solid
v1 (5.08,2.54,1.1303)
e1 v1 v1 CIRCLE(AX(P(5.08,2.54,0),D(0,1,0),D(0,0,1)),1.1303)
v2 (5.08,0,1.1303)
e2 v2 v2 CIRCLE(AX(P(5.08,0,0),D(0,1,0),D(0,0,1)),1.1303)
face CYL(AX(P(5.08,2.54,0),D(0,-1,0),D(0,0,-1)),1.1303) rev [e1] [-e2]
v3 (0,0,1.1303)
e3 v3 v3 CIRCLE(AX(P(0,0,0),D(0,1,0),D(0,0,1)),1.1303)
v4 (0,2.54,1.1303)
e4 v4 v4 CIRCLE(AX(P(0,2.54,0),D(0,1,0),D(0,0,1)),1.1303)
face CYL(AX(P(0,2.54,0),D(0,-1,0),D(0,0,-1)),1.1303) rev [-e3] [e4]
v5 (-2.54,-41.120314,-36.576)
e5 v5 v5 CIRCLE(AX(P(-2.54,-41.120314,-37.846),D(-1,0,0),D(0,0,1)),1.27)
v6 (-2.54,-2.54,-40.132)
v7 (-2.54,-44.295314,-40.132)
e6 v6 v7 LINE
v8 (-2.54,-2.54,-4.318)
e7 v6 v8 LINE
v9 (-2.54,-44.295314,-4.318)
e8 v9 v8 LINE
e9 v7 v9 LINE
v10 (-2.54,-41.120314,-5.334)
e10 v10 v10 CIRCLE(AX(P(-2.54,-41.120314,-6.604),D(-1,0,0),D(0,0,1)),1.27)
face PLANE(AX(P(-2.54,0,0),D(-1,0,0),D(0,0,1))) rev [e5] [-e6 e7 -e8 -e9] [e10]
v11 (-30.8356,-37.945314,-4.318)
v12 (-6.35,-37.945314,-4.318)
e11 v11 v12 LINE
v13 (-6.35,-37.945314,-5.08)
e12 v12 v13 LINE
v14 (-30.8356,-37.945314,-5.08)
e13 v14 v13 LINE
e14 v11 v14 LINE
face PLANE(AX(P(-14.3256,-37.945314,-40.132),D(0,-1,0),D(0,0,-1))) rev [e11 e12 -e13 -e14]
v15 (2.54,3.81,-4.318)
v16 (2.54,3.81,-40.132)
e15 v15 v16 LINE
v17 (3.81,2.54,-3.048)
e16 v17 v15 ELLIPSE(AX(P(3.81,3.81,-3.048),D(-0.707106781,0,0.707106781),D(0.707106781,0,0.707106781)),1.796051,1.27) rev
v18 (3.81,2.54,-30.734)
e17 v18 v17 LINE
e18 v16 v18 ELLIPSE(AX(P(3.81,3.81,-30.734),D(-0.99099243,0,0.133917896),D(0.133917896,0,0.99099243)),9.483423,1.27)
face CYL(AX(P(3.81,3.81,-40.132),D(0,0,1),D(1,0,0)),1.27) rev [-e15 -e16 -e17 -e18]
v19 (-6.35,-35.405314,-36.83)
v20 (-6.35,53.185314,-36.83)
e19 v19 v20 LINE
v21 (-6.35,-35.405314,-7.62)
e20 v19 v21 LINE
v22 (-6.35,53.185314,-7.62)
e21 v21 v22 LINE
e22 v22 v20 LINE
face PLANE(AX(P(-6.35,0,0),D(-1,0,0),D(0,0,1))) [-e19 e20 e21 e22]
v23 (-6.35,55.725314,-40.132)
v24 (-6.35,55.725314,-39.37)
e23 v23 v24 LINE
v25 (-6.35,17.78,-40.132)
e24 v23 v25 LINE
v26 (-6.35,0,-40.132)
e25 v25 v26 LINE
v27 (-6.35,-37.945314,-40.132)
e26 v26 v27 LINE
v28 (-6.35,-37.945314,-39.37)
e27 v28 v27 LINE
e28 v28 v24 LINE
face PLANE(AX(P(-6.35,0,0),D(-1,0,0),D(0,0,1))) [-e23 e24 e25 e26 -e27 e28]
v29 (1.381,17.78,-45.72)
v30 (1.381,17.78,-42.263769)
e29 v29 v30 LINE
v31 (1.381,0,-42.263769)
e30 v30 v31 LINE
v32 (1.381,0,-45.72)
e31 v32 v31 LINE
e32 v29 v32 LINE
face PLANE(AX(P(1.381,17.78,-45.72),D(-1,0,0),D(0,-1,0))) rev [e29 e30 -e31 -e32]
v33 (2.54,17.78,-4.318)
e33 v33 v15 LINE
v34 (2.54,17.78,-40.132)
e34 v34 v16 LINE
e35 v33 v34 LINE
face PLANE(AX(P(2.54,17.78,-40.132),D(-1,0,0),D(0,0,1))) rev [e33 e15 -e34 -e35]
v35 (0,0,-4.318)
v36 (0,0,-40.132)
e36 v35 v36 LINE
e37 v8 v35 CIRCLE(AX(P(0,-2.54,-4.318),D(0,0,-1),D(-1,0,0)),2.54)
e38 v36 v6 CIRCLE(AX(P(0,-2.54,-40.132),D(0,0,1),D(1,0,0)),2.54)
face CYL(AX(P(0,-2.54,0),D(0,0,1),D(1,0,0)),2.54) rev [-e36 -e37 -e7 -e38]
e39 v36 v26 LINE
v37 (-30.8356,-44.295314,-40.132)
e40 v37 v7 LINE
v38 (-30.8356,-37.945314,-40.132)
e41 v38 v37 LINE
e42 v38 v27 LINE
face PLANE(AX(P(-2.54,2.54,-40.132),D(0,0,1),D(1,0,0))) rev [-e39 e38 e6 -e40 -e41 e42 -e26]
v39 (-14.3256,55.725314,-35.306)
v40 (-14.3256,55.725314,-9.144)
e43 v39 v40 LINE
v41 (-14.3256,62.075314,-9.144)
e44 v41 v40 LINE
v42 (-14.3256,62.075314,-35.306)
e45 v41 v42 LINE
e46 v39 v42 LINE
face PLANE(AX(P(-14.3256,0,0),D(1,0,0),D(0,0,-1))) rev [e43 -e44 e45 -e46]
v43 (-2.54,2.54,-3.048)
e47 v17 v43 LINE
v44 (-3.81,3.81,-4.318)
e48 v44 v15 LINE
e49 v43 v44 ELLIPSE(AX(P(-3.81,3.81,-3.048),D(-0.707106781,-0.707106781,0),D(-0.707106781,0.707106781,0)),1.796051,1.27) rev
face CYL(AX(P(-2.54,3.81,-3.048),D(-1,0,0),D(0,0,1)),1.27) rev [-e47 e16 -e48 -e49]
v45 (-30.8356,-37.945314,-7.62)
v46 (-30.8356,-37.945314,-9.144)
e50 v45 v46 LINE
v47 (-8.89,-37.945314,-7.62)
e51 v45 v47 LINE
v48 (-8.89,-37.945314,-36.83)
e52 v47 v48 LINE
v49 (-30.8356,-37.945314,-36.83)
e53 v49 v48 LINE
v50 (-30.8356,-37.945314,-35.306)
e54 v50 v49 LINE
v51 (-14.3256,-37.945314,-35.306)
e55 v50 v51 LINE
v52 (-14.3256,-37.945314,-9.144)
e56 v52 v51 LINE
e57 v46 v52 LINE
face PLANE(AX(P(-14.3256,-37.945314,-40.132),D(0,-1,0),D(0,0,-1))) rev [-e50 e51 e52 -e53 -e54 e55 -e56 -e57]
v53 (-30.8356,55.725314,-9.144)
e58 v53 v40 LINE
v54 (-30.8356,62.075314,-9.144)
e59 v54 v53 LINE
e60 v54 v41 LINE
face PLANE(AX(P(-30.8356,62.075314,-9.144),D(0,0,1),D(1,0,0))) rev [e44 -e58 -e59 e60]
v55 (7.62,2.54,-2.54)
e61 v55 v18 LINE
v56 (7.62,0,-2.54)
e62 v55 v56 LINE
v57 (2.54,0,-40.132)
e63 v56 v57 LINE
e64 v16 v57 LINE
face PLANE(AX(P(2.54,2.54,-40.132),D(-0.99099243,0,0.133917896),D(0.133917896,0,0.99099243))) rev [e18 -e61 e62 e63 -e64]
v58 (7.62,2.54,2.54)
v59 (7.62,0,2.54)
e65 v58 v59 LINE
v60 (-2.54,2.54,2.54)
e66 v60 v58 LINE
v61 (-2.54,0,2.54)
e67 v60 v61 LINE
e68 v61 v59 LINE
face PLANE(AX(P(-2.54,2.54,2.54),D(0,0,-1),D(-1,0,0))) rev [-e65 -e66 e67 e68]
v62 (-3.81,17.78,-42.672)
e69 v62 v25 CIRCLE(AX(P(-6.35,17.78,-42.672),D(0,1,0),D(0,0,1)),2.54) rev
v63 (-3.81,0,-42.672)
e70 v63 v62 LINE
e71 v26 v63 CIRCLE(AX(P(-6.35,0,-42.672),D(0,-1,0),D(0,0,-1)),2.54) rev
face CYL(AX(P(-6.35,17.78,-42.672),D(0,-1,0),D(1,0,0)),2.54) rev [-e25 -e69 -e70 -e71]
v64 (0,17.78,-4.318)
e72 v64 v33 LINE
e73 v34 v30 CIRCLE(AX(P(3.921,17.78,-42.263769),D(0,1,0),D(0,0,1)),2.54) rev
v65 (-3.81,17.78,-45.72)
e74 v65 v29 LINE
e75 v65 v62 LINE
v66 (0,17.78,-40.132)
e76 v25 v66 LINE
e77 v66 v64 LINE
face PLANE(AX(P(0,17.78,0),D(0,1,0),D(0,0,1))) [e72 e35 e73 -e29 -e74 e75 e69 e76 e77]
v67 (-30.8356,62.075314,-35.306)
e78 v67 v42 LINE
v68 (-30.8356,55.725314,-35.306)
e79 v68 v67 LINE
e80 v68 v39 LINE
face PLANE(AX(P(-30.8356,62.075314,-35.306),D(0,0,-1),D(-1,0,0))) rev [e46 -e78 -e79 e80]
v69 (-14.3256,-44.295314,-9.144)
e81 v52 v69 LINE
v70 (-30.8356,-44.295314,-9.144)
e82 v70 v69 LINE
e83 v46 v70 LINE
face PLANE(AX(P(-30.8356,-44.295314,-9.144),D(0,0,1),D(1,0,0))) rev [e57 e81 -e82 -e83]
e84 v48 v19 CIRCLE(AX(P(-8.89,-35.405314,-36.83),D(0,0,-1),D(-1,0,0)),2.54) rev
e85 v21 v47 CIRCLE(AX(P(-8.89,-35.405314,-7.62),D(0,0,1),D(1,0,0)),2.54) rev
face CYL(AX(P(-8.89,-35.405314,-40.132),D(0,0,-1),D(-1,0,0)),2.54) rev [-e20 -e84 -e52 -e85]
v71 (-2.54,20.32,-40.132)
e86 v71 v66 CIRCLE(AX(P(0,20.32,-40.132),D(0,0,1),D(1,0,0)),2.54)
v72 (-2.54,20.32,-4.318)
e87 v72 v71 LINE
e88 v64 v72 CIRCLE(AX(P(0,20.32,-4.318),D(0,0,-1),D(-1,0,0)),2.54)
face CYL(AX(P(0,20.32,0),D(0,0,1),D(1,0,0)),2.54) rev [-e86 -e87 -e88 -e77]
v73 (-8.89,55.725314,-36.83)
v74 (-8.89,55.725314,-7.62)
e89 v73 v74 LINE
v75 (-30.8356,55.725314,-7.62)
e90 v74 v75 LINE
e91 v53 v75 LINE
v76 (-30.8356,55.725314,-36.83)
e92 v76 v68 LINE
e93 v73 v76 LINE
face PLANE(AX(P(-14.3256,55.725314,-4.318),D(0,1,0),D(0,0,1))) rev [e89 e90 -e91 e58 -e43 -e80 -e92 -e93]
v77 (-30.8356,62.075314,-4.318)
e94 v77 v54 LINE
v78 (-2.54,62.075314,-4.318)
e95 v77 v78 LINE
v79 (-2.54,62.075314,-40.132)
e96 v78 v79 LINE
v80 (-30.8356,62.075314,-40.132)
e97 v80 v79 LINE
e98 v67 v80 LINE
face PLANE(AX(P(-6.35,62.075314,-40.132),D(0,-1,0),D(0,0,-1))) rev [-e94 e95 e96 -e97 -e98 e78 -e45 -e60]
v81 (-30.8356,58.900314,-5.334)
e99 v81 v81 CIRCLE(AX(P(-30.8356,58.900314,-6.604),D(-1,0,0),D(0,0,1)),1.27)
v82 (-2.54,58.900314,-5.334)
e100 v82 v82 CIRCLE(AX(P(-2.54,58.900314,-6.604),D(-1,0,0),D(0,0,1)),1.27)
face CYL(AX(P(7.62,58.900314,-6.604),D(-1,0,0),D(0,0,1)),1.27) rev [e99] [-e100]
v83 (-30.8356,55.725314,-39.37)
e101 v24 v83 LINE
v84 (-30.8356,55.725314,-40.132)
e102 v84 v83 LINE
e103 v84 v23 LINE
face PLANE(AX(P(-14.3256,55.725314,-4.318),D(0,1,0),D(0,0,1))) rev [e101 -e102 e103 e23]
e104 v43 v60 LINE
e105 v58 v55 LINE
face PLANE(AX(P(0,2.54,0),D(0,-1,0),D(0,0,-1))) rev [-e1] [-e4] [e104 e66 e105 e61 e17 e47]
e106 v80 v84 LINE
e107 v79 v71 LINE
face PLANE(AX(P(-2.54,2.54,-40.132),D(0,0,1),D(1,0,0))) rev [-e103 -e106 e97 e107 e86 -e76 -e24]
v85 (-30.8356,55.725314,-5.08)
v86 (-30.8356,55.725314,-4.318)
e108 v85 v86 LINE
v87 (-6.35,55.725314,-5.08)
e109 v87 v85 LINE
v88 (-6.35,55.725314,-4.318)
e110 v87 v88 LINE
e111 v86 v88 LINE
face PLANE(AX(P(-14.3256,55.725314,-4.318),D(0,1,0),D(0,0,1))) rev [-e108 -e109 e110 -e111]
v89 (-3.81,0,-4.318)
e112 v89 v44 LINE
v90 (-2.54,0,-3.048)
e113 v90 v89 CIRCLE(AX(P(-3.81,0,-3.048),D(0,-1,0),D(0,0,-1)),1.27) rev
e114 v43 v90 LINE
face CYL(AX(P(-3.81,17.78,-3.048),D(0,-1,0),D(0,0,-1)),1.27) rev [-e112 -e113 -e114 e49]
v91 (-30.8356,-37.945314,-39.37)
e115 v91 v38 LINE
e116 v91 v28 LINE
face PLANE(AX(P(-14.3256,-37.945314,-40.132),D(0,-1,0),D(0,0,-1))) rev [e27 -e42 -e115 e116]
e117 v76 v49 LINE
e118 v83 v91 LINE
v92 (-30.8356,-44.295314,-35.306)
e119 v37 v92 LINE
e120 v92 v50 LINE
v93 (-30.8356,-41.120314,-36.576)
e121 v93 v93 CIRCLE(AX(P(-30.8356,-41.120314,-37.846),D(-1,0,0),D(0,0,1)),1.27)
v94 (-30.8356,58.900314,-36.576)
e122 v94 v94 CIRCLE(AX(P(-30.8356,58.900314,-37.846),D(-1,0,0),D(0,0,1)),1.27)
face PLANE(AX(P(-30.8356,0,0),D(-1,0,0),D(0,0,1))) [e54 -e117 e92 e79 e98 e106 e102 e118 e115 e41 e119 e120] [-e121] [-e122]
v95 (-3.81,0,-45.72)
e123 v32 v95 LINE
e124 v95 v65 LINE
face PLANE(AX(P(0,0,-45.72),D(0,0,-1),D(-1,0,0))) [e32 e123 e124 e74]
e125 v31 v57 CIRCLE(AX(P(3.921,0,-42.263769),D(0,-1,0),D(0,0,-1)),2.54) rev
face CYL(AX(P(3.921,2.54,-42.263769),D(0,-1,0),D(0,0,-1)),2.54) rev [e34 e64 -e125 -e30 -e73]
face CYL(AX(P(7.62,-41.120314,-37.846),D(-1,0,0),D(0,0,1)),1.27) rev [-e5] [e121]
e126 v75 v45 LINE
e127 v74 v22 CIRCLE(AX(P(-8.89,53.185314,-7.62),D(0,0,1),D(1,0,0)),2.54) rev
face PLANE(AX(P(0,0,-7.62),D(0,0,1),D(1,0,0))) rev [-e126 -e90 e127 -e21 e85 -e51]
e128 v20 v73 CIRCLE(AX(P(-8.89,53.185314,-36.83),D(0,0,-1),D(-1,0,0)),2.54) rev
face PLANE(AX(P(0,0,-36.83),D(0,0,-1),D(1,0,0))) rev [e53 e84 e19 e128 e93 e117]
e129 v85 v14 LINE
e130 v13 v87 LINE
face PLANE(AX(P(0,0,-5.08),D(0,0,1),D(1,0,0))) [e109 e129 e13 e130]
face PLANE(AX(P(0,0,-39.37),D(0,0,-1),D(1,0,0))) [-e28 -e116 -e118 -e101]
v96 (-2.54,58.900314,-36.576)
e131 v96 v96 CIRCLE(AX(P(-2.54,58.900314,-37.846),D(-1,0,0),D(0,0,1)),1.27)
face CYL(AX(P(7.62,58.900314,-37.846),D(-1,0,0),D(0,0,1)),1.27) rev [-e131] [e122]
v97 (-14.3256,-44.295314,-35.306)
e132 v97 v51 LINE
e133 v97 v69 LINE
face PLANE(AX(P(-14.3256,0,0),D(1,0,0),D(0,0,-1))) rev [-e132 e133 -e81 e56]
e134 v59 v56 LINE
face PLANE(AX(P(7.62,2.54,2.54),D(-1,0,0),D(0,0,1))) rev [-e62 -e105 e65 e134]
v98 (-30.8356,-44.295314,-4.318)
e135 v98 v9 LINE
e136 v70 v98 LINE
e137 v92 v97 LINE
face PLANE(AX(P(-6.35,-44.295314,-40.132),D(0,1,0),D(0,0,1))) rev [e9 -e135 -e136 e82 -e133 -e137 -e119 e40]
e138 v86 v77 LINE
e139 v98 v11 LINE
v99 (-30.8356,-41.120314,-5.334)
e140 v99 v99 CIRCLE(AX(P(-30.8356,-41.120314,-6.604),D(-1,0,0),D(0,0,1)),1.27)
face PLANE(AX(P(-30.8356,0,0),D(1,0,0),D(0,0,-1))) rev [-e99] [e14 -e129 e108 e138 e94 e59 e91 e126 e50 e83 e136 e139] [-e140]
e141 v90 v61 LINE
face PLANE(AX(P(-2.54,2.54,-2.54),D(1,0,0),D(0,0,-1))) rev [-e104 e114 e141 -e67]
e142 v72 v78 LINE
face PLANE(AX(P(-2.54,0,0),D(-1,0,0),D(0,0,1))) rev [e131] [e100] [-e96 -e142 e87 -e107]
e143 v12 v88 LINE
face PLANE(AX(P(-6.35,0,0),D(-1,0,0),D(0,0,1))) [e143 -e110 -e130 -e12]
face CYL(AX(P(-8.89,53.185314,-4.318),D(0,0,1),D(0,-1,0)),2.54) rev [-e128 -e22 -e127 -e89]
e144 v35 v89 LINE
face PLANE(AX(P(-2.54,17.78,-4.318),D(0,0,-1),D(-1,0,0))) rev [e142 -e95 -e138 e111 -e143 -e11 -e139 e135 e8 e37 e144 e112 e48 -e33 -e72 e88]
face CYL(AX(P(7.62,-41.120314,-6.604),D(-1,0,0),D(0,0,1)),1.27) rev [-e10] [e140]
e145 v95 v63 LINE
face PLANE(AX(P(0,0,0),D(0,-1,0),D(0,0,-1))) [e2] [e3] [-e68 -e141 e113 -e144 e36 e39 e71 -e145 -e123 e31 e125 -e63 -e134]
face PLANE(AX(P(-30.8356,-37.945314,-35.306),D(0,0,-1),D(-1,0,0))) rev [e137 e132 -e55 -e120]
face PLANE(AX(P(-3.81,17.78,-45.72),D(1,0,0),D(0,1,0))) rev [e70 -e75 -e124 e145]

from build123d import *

# Parameters (mm, degrees)
SKETCH1_R           = 1.1303
BOSS_EXTRUDE1_DEPTH = 2.54
SKETCH2_W           = 5.08
SKETCH2_H           = 35.814
BOSS_EXTRUDE2_DEPTH = 15.24
SKETCH3_W           = 35.814
SKETCH3_H           = 106.370628
BOSS_EXTRUDE3_DEPTH = 3.81
FILLET1_R           = 1.27
SKETCH4_W           = 5.191
SKETCH4_H           = 17.78
BOSS_EXTRUDE4_DEPTH = 5.588
SKETCH5_W           = 35.814
SKETCH5_H           = 6.35
BOSS_EXTRUDE5_DEPTH = 7.9756
SKETCH6_W           = 4.826
SKETCH6_H           = 6.35
BOSS_EXTRUDE6_DEPTH = 16.51
BOSS_EXTRUDE8_START = -0.762
SKETCH7_W           = 24.4856
SKETCH7_H           = 93.670628
BOSS_EXTRUDE8_DEPTH = 2.54
FILLET2_R           = 2.54
SKETCH8_R           = 1.27
CUT_EXTRUDE1_DEPTH  = 87.153909833


with BuildPart() as part:
    # Sketch1 → Boss-Extrude1 (new body)
    with BuildSketch(Plane(origin=(0, 0, 0), x_dir=(1, 0, 0), z_dir=(0, 1, 0))):
        Polygon((-2.54, 2.54), (-2.54, 40.132), (2.54, 40.132), (7.62, 2.54), (7.62, -2.54), (-2.54, -2.54), align=None)
        with Locations(Location((0, 0, 0), (0, 0, 270))):
            Circle(SKETCH1_R, mode=Mode.SUBTRACT)
        with Locations(Location((5.08, 0, 0), (0, 0, 270))):
            Circle(SKETCH1_R, mode=Mode.SUBTRACT)
    extrude(amount=BOSS_EXTRUDE1_DEPTH)

    # Sketch2 → Boss-Extrude2 (add)
    with BuildSketch(Plane(origin=(0, 2.54, 0), x_dir=(1, 0, 0), z_dir=(0, 1, 0))):
        with Locations((0, 22.225)):
            Rectangle(SKETCH2_W, SKETCH2_H)
    extrude(amount=BOSS_EXTRUDE2_DEPTH)

    # Sketch3 → Boss-Extrude3 (add)
    with BuildSketch(Plane.ZY.offset(2.54)):
        with Locations((-22.225, 8.89)):
            Rectangle(SKETCH3_W, SKETCH3_H)
    extrude(amount=BOSS_EXTRUDE3_DEPTH)

    # Fillet1
    fillet1_edges = [part.edges().sort_by_distance(p)[0] for p in [
        (0, 2.54, -4.318),
        (2.54, 2.54, -22.225),
        (-2.54, 1.27, -4.318),
    ]]
    fillet(fillet1_edges, radius=FILLET1_R)

    # Sketch4 → Boss-Extrude4 (add)
    with BuildSketch(Plane(origin=(0, 0, -40.132), x_dir=(-1, 0, 0), z_dir=(0, 0, -1))):
        with Locations((1.2145, 8.89)):
            Rectangle(SKETCH4_W, SKETCH4_H)
    extrude(amount=BOSS_EXTRUDE4_DEPTH)

    # Sketch5 → Boss-Extrude5 (add)
    with BuildSketch(Plane.ZY.offset(6.35)):
        with Locations((-22.225, -41.120314)):
            Rectangle(SKETCH5_W, SKETCH5_H)
        with Locations((-22.225, 58.900314)):
            Rectangle(SKETCH5_W, SKETCH5_H)
    extrude(amount=BOSS_EXTRUDE5_DEPTH)

    # Sketch6 → Boss-Extrude6 (add)
    with BuildSketch(Plane.ZY.offset(14.3256)):
        with Locations((-37.719, 58.900314)):
            Rectangle(SKETCH6_W, SKETCH6_H)
        with Locations((-6.731, 58.900314)):
            Rectangle(SKETCH6_W, SKETCH6_H)
        with Locations((-37.719, -41.120314)):
            Rectangle(SKETCH6_W, SKETCH6_H)
        with Locations((-6.731, -41.120314)):
            Rectangle(SKETCH6_W, SKETCH6_H)
    extrude(amount=BOSS_EXTRUDE6_DEPTH)

    # Sketch7 → Boss-Extrude8 (add)
    with BuildSketch(Plane.XY.offset(-4.318).offset(BOSS_EXTRUDE8_START)):
        with Locations((-18.5928, 8.89)):
            Rectangle(SKETCH7_W, SKETCH7_H)
    boss_extrude8 = extrude(amount=-BOSS_EXTRUDE8_DEPTH)

    # Mirror2: Boss-Extrude8 across plane
    add(boss_extrude8.mirror(Plane.XY.offset(-22.225)))

    # Fillet2
    # the kernel refuses this fillet: 2.54 mm, written as the material it adds along each edge
    with BuildSketch(Plane(origin=(-6.35, -37.945314, -1.27), x_dir=(-1, 0, 0), z_dir=(0, 0, -1))) as fillet2_piece_1_section:
        with BuildLine():
            CenterArc((FILLET2_R, FILLET2_R), FILLET2_R, 180, 90)
            Line((0, FILLET2_R), (0, 0))
            Line((0, 0), (FILLET2_R, 0))
        make_face()
    fillet2_piece_1 = extrude(amount=35.56, mode=Mode.PRIVATE)
    fillet2_piece_1 = split(fillet2_piece_1, bisect_by=Plane(origin=(-6.917354565, -37.377959435, -5.08), z_dir=(0, 0, -1)), keep=Keep.TOP, mode=Mode.PRIVATE)
    add(fillet2_piece_1)
    with BuildSketch(Plane(origin=(-6.35, 55.725314, -36.83), x_dir=(-1, 0, 0), z_dir=(0, 0, 1))) as fillet2_piece_2_section:
        with BuildLine():
            CenterArc((FILLET2_R, FILLET2_R), FILLET2_R, 180, 90)
            Line((0, FILLET2_R), (0, 0))
            Line((0, 0), (FILLET2_R, 0))
        make_face()
    fillet2_piece_2 = extrude(amount=35.56, mode=Mode.PRIVATE)
    fillet2_piece_2 = split(fillet2_piece_2, bisect_by=Plane(origin=(-6.917354565, 55.157959435, -5.08), z_dir=(0, 0, -1)), keep=Keep.TOP, mode=Mode.PRIVATE)
    add(fillet2_piece_2)
    with BuildSketch(Plane(origin=(-2.54, 17.78, -4.318), x_dir=(1, 0, 0), z_dir=(0, 0, -1)), Plane(origin=(-2.54, 0, -40.132), x_dir=(1, 0, 0), z_dir=(0, 0, 1))) as fillet2_piece_3:
        with BuildLine():
            CenterArc((FILLET2_R, -FILLET2_R), FILLET2_R, 90, 90)
            Line((0, -FILLET2_R), (0, 0))
            Line((0, 0), (FILLET2_R, 0))
        make_face()
    extrude(amount=35.814)
    with BuildSketch(Plane(origin=(1.381, 0, -40.132), x_dir=(0, 0, -1), z_dir=(0, 1, 0))) as fillet2_piece_4:
        with BuildLine():
            CenterArc((2.131768984, -2.54), FILLET2_R, 90, 57.064075369)
            Line((0, -1.159), (0, 0))
            Line((0, 0), (2.131768984, 0))
        make_face()
    extrude(amount=3.810000082)
    with BuildSketch(Plane(origin=(1.381, 3.810000082, -40.132), x_dir=(0, 0, -1), z_dir=(0, 1, 0))) as fillet2_piece_5:
        with BuildLine():
            CenterArc((2.131768984, -2.54), FILLET2_R, 90, 57.064075369)
            Line((0, -1.159), (0, 0))
            Line((0, 0), (2.131768984, 0))
        make_face()
    extrude(amount=13.969999918)
    with BuildSketch(Plane(origin=(-3.81, 17.78, -40.132), x_dir=(-1, 0, 0), z_dir=(0, -1, 0))) as fillet2_piece_6:
        with BuildLine():
            CenterArc((FILLET2_R, FILLET2_R), FILLET2_R, 180, 90)
            Line((0, FILLET2_R), (0, 0))
            Line((0, 0), (FILLET2_R, 0))
        make_face()
    extrude(amount=17.78)

    # Sketch8 → Cut-Extrude1 (cut, through all)
    with BuildSketch(Plane.ZY.offset(30.8356)):
        with Locations((-37.846, 58.900314)):
            Circle(SKETCH8_R)
        with Locations((-6.604, 58.900314)):
            Circle(SKETCH8_R)
        with Locations((-37.846, -41.120314)):
            Circle(SKETCH8_R)
        with Locations((-6.604, -41.120314)):
            Circle(SKETCH8_R)
    extrude(amount=-CUT_EXTRUDE1_DEPTH, mode=Mode.SUBTRACT)


solid = part.part
